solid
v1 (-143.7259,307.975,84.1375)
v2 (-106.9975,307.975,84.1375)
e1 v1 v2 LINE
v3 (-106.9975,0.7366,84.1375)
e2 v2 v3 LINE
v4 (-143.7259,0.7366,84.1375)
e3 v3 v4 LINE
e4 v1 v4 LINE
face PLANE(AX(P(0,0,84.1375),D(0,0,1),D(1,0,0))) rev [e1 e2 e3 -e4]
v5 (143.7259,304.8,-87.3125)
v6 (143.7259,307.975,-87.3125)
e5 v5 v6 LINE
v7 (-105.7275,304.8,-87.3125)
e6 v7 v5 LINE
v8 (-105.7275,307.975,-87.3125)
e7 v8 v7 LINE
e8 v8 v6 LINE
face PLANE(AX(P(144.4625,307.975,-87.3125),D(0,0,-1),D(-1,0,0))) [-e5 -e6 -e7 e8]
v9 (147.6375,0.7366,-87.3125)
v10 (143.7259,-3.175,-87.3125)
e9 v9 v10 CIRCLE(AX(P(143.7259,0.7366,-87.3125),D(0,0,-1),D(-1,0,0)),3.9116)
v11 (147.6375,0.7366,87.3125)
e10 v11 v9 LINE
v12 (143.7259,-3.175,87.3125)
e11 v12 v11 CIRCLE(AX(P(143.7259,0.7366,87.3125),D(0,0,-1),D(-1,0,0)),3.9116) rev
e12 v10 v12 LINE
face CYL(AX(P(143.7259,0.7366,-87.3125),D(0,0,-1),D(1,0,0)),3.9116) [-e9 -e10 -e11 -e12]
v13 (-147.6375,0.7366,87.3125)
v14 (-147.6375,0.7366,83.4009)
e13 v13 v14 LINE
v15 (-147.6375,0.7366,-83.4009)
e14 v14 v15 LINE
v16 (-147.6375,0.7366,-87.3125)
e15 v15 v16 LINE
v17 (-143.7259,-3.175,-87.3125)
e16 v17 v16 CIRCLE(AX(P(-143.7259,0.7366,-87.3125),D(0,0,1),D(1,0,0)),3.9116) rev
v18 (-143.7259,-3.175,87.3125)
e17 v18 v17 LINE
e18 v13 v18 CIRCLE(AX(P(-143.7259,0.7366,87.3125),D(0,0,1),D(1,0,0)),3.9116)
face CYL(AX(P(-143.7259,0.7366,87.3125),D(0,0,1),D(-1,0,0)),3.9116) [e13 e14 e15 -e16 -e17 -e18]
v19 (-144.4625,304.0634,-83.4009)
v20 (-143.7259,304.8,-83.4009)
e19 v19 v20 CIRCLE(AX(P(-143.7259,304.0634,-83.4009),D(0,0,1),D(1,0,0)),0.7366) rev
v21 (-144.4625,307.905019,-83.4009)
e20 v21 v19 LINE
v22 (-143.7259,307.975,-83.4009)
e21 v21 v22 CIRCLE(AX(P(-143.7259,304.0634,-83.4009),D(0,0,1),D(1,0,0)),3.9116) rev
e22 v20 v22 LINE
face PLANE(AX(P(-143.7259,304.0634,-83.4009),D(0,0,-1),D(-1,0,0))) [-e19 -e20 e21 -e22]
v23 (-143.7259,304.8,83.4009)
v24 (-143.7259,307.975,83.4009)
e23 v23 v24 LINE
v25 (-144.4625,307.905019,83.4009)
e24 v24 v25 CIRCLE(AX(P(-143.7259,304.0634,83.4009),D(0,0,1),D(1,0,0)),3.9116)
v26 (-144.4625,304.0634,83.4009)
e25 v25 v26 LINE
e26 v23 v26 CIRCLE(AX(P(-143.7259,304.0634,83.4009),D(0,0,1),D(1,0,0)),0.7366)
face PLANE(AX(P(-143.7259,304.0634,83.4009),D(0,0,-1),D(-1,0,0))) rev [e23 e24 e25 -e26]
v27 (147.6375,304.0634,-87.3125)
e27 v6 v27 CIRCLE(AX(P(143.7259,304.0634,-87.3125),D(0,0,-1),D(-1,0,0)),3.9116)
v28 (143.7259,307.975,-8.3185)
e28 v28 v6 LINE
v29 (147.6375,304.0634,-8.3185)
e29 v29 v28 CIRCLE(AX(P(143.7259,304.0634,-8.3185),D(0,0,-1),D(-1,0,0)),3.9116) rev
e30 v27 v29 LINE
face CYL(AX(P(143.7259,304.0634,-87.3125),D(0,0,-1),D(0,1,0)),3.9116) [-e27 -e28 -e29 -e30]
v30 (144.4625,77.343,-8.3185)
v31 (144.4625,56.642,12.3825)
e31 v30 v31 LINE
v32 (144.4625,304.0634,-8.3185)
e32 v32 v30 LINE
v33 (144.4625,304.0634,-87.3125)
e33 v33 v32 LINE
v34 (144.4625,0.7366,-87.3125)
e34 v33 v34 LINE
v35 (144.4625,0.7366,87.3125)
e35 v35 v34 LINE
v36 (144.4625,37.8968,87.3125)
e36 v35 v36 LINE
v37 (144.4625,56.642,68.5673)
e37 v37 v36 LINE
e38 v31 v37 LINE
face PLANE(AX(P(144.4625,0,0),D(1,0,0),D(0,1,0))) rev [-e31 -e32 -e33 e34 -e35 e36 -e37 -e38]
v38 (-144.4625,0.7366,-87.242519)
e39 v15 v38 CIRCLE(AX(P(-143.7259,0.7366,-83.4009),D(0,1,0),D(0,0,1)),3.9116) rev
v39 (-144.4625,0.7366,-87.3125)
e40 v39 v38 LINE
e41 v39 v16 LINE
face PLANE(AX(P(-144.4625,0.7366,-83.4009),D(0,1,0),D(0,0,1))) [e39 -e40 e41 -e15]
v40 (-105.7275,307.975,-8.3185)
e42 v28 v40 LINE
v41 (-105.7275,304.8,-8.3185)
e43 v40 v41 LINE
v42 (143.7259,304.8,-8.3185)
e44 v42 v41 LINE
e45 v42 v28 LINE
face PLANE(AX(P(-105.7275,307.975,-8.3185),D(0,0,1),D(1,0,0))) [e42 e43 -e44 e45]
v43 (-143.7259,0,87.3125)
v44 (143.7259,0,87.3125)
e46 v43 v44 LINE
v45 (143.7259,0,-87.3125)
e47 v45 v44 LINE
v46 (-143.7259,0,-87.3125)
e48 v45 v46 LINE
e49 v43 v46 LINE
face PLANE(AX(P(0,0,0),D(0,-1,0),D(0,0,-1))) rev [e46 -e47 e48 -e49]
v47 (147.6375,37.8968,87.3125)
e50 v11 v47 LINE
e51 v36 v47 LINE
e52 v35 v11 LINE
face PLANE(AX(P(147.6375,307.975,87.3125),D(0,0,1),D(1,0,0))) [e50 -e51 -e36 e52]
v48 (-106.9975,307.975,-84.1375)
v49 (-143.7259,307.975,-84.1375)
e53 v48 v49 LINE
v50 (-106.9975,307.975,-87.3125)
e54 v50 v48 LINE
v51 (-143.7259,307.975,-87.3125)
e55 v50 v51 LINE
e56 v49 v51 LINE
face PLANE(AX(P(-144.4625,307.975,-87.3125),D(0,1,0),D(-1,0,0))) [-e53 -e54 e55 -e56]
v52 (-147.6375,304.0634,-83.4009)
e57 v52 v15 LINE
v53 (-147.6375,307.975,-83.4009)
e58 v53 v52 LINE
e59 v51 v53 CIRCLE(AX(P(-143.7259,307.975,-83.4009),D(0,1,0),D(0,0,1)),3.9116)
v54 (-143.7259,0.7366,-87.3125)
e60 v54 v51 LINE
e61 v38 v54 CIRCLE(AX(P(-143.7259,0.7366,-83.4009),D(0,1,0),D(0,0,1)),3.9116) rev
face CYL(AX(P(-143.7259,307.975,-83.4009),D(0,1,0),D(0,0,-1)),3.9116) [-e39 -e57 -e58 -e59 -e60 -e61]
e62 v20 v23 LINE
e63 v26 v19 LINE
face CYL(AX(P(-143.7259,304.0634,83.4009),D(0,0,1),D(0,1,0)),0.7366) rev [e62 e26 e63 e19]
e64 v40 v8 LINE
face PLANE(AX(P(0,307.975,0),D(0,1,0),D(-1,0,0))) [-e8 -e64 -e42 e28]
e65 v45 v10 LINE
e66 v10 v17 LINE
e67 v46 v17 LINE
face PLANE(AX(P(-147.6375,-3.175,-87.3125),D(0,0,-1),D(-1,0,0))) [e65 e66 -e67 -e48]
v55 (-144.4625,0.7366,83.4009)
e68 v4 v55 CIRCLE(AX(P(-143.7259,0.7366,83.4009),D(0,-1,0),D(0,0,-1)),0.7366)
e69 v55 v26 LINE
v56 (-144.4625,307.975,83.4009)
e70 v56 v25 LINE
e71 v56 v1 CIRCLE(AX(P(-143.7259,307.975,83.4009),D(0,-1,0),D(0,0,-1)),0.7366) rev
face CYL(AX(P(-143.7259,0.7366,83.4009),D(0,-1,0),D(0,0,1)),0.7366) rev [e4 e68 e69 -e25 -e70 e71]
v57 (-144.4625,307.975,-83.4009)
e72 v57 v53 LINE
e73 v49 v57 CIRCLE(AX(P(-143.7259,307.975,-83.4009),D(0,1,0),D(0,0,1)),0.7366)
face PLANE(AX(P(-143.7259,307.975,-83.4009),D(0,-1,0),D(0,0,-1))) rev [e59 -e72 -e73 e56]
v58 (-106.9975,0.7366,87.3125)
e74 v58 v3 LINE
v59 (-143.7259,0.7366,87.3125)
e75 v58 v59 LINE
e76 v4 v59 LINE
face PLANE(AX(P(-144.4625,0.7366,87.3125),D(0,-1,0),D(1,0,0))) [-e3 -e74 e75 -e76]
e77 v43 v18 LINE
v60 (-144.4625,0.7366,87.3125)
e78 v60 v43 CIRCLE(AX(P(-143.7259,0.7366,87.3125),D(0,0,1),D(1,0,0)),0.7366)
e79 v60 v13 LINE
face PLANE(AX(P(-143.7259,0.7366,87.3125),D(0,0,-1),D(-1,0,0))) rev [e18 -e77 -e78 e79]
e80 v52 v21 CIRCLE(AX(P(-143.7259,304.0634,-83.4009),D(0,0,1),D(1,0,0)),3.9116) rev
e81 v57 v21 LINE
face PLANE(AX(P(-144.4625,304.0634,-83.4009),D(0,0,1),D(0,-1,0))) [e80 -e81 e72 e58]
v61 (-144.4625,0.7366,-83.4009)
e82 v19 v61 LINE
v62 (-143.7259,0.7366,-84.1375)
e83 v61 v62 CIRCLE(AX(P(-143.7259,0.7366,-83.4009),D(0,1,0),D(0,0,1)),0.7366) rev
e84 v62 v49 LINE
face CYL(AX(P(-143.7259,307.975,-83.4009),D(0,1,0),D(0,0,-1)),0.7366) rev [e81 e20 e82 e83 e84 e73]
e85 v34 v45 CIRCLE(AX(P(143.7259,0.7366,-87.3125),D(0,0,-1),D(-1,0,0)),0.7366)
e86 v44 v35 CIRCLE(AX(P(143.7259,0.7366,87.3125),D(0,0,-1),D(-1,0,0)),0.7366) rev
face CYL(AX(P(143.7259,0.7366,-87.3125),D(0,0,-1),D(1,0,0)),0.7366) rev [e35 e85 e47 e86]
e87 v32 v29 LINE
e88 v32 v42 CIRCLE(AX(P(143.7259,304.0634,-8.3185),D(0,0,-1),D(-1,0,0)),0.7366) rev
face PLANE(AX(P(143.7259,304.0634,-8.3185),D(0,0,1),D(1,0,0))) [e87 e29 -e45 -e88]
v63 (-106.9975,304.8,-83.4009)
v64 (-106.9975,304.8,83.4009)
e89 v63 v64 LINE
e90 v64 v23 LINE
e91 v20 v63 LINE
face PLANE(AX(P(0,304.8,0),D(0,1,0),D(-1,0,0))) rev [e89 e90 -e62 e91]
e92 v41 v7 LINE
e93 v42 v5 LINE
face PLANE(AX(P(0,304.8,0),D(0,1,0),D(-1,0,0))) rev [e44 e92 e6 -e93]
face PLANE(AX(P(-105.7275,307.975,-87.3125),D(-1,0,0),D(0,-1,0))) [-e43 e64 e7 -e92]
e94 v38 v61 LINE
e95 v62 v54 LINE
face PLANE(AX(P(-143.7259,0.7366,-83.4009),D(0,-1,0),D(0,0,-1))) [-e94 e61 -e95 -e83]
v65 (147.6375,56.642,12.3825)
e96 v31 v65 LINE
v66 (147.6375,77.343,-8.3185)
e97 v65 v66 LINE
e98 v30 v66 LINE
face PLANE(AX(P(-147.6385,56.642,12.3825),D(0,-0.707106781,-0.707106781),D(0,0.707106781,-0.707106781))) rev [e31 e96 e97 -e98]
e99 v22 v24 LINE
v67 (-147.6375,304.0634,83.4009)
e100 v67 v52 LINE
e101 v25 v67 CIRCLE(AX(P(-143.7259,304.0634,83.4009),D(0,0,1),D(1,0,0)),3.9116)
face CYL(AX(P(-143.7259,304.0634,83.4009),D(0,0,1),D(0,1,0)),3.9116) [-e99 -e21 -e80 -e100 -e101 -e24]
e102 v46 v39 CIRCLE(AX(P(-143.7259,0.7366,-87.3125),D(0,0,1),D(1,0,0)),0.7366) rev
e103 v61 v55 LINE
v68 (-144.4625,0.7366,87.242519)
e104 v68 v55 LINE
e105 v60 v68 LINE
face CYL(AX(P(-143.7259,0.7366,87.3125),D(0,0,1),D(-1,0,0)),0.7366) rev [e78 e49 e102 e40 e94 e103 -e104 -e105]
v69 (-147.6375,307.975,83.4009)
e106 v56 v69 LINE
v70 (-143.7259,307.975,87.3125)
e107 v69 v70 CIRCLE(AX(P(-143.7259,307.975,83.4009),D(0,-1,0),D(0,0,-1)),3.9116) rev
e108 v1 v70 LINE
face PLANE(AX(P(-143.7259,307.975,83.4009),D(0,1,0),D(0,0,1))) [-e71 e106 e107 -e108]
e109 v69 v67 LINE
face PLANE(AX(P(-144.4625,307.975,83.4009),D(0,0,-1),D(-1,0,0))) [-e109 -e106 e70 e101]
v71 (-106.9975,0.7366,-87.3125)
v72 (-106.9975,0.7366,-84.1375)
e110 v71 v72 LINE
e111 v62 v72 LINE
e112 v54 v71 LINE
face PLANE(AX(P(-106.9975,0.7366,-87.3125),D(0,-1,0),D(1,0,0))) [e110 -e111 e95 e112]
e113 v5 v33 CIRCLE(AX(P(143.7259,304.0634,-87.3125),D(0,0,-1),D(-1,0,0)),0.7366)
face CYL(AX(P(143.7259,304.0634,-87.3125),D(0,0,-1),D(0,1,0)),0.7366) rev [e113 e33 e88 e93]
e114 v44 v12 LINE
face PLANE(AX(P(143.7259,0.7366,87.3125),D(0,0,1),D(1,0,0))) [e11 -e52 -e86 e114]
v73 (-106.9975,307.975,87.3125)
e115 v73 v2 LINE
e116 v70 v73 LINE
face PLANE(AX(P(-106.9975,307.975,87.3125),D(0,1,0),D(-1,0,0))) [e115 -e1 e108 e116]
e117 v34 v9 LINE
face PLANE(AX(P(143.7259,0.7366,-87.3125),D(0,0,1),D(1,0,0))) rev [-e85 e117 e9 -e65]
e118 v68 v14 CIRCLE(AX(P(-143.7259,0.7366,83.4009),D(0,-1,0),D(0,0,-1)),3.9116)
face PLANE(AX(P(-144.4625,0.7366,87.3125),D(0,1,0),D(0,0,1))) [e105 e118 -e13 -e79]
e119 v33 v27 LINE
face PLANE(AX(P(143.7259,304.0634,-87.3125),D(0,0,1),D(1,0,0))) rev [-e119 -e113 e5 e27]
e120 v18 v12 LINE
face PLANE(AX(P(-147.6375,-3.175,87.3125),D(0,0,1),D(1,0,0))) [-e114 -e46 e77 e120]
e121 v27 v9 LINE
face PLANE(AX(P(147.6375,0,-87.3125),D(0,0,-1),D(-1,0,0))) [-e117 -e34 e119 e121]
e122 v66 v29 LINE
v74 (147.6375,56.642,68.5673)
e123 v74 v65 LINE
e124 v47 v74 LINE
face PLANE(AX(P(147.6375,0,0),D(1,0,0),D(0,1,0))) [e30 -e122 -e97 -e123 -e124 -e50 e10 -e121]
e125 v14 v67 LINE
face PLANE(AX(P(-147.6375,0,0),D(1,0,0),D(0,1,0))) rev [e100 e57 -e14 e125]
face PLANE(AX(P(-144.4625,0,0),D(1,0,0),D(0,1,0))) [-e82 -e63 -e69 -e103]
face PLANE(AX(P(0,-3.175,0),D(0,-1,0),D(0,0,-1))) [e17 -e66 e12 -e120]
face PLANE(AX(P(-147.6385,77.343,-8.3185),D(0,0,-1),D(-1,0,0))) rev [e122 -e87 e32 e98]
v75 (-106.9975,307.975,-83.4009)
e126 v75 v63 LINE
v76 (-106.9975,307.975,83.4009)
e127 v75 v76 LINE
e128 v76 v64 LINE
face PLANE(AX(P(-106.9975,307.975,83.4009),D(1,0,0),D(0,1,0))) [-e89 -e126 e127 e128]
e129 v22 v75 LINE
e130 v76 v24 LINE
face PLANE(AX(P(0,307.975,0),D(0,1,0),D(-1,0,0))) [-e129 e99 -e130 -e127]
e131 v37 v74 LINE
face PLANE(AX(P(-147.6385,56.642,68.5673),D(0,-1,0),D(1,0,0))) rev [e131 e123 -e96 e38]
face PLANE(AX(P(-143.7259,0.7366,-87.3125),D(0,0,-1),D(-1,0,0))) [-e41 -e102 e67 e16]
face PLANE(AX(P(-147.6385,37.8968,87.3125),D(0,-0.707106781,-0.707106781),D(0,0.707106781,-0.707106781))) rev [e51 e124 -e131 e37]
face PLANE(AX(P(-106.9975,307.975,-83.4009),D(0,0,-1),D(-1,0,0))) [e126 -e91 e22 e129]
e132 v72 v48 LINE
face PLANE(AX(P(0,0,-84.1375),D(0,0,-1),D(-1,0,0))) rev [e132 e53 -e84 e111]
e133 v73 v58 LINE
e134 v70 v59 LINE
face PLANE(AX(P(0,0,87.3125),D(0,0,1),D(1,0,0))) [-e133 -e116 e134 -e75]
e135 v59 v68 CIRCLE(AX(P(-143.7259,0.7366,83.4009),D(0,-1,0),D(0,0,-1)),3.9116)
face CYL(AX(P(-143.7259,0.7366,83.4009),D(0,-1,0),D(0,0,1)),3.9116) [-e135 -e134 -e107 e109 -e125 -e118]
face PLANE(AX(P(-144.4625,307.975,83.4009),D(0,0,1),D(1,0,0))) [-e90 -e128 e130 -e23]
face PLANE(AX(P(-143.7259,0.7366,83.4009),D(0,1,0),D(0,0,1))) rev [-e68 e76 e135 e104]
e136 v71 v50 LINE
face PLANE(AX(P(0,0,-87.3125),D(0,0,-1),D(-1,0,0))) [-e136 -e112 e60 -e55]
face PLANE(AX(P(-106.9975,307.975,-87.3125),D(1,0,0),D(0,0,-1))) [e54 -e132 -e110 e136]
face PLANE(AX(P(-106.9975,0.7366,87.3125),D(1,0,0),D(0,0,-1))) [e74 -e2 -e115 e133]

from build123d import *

# Parameters (mm, degrees)
SKETCH1_W                    = 295.275
SKETCH1_H                    = 174.625
BASE_FLANGE1_DEPTH           = 3.175
EDGE_FLANGE1_STRIP_W         = 14.1732
EDGE_FLANGE1_STRIP_H         = 3.175
EDGE_FLANGE1_STRIP_CUT_DEPTH = 174.625
EDGE_FLANGE1_DEPTH           = 174.625
EDGE_FLANGE2_STRIP_W         = 14.1732
EDGE_FLANGE2_STRIP_H         = 3.175
EDGE_FLANGE2_STRIP_CUT_DEPTH = 307.2384
EDGE_FLANGE2_DEPTH           = 307.2384
EDGE_FLANGE3_STRIP_W         = 14.1732
EDGE_FLANGE3_STRIP_H         = 3.175
EDGE_FLANGE3_STRIP_CUT_DEPTH = 307.2384
EDGE_FLANGE3_DEPTH           = 307.2384
EDGE_FLANGE4_STRIP_W         = 14.1732
EDGE_FLANGE4_STRIP_H         = 3.175
EDGE_FLANGE4_STRIP_CUT_DEPTH = 166.8018
EDGE_FLANGE4_DEPTH           = 166.8018
EDGE_FLANGE5_STRIP_W         = 14.1732
EDGE_FLANGE5_STRIP_H         = 3.175
EDGE_FLANGE5_STRIP_CUT_DEPTH = 174.625
EDGE_FLANGE5_DEPTH           = 174.625
CUT_EXTRUDE1_REACH           = 437.499
EDGE_FLANGE7_STRIP_W         = 14.1732
EDGE_FLANGE7_STRIP_H         = 3.175
EDGE_FLANGE7_STRIP_CUT_DEPTH = 78.994
EDGE_FLANGE7_DEPTH           = 78.994


# Sheet-metal steps are written as plain solids
with BuildPart() as part:
    # Sketch1 → Base-Flange1 (new body)
    with BuildSketch(Plane(origin=(0, 0, 0), x_dir=(1, 0, 0), z_dir=(0, 1, 0))):
        Rectangle(SKETCH1_W, SKETCH1_H)
    extrude(amount=-BASE_FLANGE1_DEPTH)

    # Edge-Flange1 strip (across the edge) → Edge-Flange1 strip cut (cut)
    with BuildSketch(Plane(origin=(-147.6375, 0, -87.3125), x_dir=(1, 0, 0), z_dir=(0, 0, 1))):
        with Locations((-3.175, -1.5875)):
            Rectangle(EDGE_FLANGE1_STRIP_W, EDGE_FLANGE1_STRIP_H)
    extrude(amount=EDGE_FLANGE1_STRIP_CUT_DEPTH, mode=Mode.SUBTRACT)

    # Edge-Flange1 section (across the edge) → Edge-Flange1 (add)
    with BuildSketch(Plane(origin=(-147.6375, 0, -87.3125), x_dir=(1, 0, 0), z_dir=(0, 0, 1))):
        with BuildLine():
            Line((0, 0.7366), (0, 307.975))
            Line((0, 307.975), (3.175, 307.975))
            Line((3.175, 307.975), (3.175, 0.7366))
            ThreePointArc((3.175, 0.7366), (3.390745145, 0.215745145), (3.9116, 0))
            Line((3.9116, 0), (3.9116, -3.175))
            ThreePointArc((3.9116, -3.175), (1.145681115, -2.029318885), (0, 0.7366))
        make_face()
    extrude(amount=EDGE_FLANGE1_DEPTH)

    # Edge-Flange2 strip (across the edge) → Edge-Flange2 strip cut (cut)
    with BuildSketch(Plane(origin=(-144.4625, 307.975, 87.3125), x_dir=(0, 0, -1), z_dir=(0, -1, 0))):
        with Locations((-3.175, -1.5875)):
            Rectangle(EDGE_FLANGE2_STRIP_W, EDGE_FLANGE2_STRIP_H)
    extrude(amount=EDGE_FLANGE2_STRIP_CUT_DEPTH, mode=Mode.SUBTRACT)

    # Edge-Flange2 section (across the edge) → Edge-Flange2 (add)
    with BuildSketch(Plane(origin=(-144.4625, 307.975, 87.3125), x_dir=(0, 0, -1), z_dir=(0, -1, 0))):
        with BuildLine():
            Line((0, 0.7366), (0, 37.465))
            Line((0, 37.465), (3.175, 37.465))
            Line((3.175, 37.465), (3.175, 0.7366))
            ThreePointArc((3.175, 0.7366), (3.390745145, 0.215745145), (3.9116, 0))
            Line((3.9116, 0), (3.9116, -3.175))
            ThreePointArc((3.9116, -3.175), (1.145681115, -2.029318885), (0, 0.7366))
        make_face()
    extrude(amount=EDGE_FLANGE2_DEPTH)

    # Edge-Flange3 strip (across the edge) → Edge-Flange3 strip cut (cut)
    with BuildSketch(Plane(origin=(-144.4625, 0.7366, -87.3125), x_dir=(0, 0, 1), z_dir=(0, 1, 0))):
        with Locations((-3.175, -1.5875)):
            Rectangle(EDGE_FLANGE3_STRIP_W, EDGE_FLANGE3_STRIP_H)
    extrude(amount=EDGE_FLANGE3_STRIP_CUT_DEPTH, mode=Mode.SUBTRACT)

    # Edge-Flange3 section (across the edge) → Edge-Flange3 (add)
    with BuildSketch(Plane(origin=(-144.4625, 0.7366, -87.3125), x_dir=(0, 0, 1), z_dir=(0, 1, 0))):
        with BuildLine():
            Line((0, 0.7366), (0, 37.465))
            Line((0, 37.465), (3.175, 37.465))
            Line((3.175, 37.465), (3.175, 0.7366))
            ThreePointArc((3.175, 0.7366), (3.390745145, 0.215745145), (3.9116, 0))
            Line((3.9116, 0), (3.9116, -3.175))
            ThreePointArc((3.9116, -3.175), (1.145681115, -2.029318885), (0, 0.7366))
        make_face()
    extrude(amount=EDGE_FLANGE3_DEPTH)

    # Edge-Flange4 strip (across the edge) → Edge-Flange4 strip cut (cut)
    with BuildSketch(Plane(origin=(-144.4625, 307.975, -83.4009), x_dir=(0, -1, 0), z_dir=(0, 0, 1))):
        with Locations((-3.175, -1.5875)):
            Rectangle(EDGE_FLANGE4_STRIP_W, EDGE_FLANGE4_STRIP_H)
    extrude(amount=EDGE_FLANGE4_STRIP_CUT_DEPTH, mode=Mode.SUBTRACT)

    # Edge-Flange4 section (across the edge) → Edge-Flange4 (add)
    with BuildSketch(Plane(origin=(-144.4625, 307.975, -83.4009), x_dir=(0, -1, 0), z_dir=(0, 0, 1))):
        with BuildLine():
            Line((0, 0.7366), (0, 37.465))
            Line((0, 37.465), (3.175, 37.465))
            Line((3.175, 37.465), (3.175, 0.7366))
            ThreePointArc((3.175, 0.7366), (3.390745145, 0.215745145), (3.9116, 0))
            Line((3.9116, 0), (3.9116, -3.175))
            ThreePointArc((3.9116, -3.175), (1.145681115, -2.029318885), (0, 0.7366))
        make_face()
    extrude(amount=EDGE_FLANGE4_DEPTH)

    # Edge-Flange5 strip (across the edge) → Edge-Flange5 strip cut (cut)
    with BuildSketch(Plane(origin=(147.6375, 0, 87.3125), x_dir=(-1, 0, 0), z_dir=(0, 0, -1))):
        with Locations((-3.175, -1.5875)):
            Rectangle(EDGE_FLANGE5_STRIP_W, EDGE_FLANGE5_STRIP_H)
    extrude(amount=EDGE_FLANGE5_STRIP_CUT_DEPTH, mode=Mode.SUBTRACT)

    # Edge-Flange5 section (across the edge) → Edge-Flange5 (add)
    with BuildSketch(Plane(origin=(147.6375, 0, 87.3125), x_dir=(-1, 0, 0), z_dir=(0, 0, -1))):
        with BuildLine():
            Line((0, 0.7366), (0, 307.975))
            Line((0, 307.975), (3.175, 307.975))
            Line((3.175, 307.975), (3.175, 0.7366))
            ThreePointArc((3.175, 0.7366), (3.390745145, 0.215745145), (3.9116, 0))
            Line((3.9116, 0), (3.9116, -3.175))
            ThreePointArc((3.9116, -3.175), (1.145681115, -2.029318885), (0, 0.7366))
        make_face()
    extrude(amount=EDGE_FLANGE5_DEPTH)

    # Sketch29 → Cut-Extrude1 (cut, up to next)
    with BuildSketch(Plane(origin=(147.6375, 0, 0), x_dir=(0, 0, -1), z_dir=(1, 0, 0)), mode=Mode.PRIVATE) as cut_extrude1_sk1:
        Polygon((-87.3125, 37.8968), (-68.5673, 56.642), (-12.3825, 56.642), (8.3185, 77.343), (8.3185, 307.975), (-87.3125, 307.975), align=None)
    cut_extrude1_tool1 = extrude(cut_extrude1_sk1.sketch, amount=-CUT_EXTRUDE1_REACH, mode=Mode.PRIVATE) & part.part
    add(cut_extrude1_tool1.solids().sort_by_distance((147.6375, 182.403147, 40.166664))[0], mode=Mode.SUBTRACT)

    # Edge-Flange7 strip (across the edge) → Edge-Flange7 strip cut (cut)
    with BuildSketch(Plane(origin=(144.4625, 307.975, -8.3185), x_dir=(0, -1, 0), z_dir=(0, 0, -1))):
        with Locations((-3.175, -1.5875)):
            Rectangle(EDGE_FLANGE7_STRIP_W, EDGE_FLANGE7_STRIP_H)
    extrude(amount=EDGE_FLANGE7_STRIP_CUT_DEPTH, mode=Mode.SUBTRACT)

    # Edge-Flange7 section (across the edge) → Edge-Flange7 (add)
    with BuildSketch(Plane(origin=(144.4625, 307.975, -8.3185), x_dir=(0, -1, 0), z_dir=(0, 0, -1))):
        with BuildLine():
            Line((0, 0.7366), (0, 250.19))
            Line((0, 250.19), (3.175, 250.19))
            Line((3.175, 250.19), (3.175, 0.7366))
            ThreePointArc((3.175, 0.7366), (3.390745145, 0.215745145), (3.9116, 0))
            Line((3.9116, 0), (3.9116, -3.175))
            ThreePointArc((3.9116, -3.175), (1.145681115, -2.029318885), (0, 0.7366))
        make_face()
    extrude(amount=EDGE_FLANGE7_DEPTH)


solid = part.part
